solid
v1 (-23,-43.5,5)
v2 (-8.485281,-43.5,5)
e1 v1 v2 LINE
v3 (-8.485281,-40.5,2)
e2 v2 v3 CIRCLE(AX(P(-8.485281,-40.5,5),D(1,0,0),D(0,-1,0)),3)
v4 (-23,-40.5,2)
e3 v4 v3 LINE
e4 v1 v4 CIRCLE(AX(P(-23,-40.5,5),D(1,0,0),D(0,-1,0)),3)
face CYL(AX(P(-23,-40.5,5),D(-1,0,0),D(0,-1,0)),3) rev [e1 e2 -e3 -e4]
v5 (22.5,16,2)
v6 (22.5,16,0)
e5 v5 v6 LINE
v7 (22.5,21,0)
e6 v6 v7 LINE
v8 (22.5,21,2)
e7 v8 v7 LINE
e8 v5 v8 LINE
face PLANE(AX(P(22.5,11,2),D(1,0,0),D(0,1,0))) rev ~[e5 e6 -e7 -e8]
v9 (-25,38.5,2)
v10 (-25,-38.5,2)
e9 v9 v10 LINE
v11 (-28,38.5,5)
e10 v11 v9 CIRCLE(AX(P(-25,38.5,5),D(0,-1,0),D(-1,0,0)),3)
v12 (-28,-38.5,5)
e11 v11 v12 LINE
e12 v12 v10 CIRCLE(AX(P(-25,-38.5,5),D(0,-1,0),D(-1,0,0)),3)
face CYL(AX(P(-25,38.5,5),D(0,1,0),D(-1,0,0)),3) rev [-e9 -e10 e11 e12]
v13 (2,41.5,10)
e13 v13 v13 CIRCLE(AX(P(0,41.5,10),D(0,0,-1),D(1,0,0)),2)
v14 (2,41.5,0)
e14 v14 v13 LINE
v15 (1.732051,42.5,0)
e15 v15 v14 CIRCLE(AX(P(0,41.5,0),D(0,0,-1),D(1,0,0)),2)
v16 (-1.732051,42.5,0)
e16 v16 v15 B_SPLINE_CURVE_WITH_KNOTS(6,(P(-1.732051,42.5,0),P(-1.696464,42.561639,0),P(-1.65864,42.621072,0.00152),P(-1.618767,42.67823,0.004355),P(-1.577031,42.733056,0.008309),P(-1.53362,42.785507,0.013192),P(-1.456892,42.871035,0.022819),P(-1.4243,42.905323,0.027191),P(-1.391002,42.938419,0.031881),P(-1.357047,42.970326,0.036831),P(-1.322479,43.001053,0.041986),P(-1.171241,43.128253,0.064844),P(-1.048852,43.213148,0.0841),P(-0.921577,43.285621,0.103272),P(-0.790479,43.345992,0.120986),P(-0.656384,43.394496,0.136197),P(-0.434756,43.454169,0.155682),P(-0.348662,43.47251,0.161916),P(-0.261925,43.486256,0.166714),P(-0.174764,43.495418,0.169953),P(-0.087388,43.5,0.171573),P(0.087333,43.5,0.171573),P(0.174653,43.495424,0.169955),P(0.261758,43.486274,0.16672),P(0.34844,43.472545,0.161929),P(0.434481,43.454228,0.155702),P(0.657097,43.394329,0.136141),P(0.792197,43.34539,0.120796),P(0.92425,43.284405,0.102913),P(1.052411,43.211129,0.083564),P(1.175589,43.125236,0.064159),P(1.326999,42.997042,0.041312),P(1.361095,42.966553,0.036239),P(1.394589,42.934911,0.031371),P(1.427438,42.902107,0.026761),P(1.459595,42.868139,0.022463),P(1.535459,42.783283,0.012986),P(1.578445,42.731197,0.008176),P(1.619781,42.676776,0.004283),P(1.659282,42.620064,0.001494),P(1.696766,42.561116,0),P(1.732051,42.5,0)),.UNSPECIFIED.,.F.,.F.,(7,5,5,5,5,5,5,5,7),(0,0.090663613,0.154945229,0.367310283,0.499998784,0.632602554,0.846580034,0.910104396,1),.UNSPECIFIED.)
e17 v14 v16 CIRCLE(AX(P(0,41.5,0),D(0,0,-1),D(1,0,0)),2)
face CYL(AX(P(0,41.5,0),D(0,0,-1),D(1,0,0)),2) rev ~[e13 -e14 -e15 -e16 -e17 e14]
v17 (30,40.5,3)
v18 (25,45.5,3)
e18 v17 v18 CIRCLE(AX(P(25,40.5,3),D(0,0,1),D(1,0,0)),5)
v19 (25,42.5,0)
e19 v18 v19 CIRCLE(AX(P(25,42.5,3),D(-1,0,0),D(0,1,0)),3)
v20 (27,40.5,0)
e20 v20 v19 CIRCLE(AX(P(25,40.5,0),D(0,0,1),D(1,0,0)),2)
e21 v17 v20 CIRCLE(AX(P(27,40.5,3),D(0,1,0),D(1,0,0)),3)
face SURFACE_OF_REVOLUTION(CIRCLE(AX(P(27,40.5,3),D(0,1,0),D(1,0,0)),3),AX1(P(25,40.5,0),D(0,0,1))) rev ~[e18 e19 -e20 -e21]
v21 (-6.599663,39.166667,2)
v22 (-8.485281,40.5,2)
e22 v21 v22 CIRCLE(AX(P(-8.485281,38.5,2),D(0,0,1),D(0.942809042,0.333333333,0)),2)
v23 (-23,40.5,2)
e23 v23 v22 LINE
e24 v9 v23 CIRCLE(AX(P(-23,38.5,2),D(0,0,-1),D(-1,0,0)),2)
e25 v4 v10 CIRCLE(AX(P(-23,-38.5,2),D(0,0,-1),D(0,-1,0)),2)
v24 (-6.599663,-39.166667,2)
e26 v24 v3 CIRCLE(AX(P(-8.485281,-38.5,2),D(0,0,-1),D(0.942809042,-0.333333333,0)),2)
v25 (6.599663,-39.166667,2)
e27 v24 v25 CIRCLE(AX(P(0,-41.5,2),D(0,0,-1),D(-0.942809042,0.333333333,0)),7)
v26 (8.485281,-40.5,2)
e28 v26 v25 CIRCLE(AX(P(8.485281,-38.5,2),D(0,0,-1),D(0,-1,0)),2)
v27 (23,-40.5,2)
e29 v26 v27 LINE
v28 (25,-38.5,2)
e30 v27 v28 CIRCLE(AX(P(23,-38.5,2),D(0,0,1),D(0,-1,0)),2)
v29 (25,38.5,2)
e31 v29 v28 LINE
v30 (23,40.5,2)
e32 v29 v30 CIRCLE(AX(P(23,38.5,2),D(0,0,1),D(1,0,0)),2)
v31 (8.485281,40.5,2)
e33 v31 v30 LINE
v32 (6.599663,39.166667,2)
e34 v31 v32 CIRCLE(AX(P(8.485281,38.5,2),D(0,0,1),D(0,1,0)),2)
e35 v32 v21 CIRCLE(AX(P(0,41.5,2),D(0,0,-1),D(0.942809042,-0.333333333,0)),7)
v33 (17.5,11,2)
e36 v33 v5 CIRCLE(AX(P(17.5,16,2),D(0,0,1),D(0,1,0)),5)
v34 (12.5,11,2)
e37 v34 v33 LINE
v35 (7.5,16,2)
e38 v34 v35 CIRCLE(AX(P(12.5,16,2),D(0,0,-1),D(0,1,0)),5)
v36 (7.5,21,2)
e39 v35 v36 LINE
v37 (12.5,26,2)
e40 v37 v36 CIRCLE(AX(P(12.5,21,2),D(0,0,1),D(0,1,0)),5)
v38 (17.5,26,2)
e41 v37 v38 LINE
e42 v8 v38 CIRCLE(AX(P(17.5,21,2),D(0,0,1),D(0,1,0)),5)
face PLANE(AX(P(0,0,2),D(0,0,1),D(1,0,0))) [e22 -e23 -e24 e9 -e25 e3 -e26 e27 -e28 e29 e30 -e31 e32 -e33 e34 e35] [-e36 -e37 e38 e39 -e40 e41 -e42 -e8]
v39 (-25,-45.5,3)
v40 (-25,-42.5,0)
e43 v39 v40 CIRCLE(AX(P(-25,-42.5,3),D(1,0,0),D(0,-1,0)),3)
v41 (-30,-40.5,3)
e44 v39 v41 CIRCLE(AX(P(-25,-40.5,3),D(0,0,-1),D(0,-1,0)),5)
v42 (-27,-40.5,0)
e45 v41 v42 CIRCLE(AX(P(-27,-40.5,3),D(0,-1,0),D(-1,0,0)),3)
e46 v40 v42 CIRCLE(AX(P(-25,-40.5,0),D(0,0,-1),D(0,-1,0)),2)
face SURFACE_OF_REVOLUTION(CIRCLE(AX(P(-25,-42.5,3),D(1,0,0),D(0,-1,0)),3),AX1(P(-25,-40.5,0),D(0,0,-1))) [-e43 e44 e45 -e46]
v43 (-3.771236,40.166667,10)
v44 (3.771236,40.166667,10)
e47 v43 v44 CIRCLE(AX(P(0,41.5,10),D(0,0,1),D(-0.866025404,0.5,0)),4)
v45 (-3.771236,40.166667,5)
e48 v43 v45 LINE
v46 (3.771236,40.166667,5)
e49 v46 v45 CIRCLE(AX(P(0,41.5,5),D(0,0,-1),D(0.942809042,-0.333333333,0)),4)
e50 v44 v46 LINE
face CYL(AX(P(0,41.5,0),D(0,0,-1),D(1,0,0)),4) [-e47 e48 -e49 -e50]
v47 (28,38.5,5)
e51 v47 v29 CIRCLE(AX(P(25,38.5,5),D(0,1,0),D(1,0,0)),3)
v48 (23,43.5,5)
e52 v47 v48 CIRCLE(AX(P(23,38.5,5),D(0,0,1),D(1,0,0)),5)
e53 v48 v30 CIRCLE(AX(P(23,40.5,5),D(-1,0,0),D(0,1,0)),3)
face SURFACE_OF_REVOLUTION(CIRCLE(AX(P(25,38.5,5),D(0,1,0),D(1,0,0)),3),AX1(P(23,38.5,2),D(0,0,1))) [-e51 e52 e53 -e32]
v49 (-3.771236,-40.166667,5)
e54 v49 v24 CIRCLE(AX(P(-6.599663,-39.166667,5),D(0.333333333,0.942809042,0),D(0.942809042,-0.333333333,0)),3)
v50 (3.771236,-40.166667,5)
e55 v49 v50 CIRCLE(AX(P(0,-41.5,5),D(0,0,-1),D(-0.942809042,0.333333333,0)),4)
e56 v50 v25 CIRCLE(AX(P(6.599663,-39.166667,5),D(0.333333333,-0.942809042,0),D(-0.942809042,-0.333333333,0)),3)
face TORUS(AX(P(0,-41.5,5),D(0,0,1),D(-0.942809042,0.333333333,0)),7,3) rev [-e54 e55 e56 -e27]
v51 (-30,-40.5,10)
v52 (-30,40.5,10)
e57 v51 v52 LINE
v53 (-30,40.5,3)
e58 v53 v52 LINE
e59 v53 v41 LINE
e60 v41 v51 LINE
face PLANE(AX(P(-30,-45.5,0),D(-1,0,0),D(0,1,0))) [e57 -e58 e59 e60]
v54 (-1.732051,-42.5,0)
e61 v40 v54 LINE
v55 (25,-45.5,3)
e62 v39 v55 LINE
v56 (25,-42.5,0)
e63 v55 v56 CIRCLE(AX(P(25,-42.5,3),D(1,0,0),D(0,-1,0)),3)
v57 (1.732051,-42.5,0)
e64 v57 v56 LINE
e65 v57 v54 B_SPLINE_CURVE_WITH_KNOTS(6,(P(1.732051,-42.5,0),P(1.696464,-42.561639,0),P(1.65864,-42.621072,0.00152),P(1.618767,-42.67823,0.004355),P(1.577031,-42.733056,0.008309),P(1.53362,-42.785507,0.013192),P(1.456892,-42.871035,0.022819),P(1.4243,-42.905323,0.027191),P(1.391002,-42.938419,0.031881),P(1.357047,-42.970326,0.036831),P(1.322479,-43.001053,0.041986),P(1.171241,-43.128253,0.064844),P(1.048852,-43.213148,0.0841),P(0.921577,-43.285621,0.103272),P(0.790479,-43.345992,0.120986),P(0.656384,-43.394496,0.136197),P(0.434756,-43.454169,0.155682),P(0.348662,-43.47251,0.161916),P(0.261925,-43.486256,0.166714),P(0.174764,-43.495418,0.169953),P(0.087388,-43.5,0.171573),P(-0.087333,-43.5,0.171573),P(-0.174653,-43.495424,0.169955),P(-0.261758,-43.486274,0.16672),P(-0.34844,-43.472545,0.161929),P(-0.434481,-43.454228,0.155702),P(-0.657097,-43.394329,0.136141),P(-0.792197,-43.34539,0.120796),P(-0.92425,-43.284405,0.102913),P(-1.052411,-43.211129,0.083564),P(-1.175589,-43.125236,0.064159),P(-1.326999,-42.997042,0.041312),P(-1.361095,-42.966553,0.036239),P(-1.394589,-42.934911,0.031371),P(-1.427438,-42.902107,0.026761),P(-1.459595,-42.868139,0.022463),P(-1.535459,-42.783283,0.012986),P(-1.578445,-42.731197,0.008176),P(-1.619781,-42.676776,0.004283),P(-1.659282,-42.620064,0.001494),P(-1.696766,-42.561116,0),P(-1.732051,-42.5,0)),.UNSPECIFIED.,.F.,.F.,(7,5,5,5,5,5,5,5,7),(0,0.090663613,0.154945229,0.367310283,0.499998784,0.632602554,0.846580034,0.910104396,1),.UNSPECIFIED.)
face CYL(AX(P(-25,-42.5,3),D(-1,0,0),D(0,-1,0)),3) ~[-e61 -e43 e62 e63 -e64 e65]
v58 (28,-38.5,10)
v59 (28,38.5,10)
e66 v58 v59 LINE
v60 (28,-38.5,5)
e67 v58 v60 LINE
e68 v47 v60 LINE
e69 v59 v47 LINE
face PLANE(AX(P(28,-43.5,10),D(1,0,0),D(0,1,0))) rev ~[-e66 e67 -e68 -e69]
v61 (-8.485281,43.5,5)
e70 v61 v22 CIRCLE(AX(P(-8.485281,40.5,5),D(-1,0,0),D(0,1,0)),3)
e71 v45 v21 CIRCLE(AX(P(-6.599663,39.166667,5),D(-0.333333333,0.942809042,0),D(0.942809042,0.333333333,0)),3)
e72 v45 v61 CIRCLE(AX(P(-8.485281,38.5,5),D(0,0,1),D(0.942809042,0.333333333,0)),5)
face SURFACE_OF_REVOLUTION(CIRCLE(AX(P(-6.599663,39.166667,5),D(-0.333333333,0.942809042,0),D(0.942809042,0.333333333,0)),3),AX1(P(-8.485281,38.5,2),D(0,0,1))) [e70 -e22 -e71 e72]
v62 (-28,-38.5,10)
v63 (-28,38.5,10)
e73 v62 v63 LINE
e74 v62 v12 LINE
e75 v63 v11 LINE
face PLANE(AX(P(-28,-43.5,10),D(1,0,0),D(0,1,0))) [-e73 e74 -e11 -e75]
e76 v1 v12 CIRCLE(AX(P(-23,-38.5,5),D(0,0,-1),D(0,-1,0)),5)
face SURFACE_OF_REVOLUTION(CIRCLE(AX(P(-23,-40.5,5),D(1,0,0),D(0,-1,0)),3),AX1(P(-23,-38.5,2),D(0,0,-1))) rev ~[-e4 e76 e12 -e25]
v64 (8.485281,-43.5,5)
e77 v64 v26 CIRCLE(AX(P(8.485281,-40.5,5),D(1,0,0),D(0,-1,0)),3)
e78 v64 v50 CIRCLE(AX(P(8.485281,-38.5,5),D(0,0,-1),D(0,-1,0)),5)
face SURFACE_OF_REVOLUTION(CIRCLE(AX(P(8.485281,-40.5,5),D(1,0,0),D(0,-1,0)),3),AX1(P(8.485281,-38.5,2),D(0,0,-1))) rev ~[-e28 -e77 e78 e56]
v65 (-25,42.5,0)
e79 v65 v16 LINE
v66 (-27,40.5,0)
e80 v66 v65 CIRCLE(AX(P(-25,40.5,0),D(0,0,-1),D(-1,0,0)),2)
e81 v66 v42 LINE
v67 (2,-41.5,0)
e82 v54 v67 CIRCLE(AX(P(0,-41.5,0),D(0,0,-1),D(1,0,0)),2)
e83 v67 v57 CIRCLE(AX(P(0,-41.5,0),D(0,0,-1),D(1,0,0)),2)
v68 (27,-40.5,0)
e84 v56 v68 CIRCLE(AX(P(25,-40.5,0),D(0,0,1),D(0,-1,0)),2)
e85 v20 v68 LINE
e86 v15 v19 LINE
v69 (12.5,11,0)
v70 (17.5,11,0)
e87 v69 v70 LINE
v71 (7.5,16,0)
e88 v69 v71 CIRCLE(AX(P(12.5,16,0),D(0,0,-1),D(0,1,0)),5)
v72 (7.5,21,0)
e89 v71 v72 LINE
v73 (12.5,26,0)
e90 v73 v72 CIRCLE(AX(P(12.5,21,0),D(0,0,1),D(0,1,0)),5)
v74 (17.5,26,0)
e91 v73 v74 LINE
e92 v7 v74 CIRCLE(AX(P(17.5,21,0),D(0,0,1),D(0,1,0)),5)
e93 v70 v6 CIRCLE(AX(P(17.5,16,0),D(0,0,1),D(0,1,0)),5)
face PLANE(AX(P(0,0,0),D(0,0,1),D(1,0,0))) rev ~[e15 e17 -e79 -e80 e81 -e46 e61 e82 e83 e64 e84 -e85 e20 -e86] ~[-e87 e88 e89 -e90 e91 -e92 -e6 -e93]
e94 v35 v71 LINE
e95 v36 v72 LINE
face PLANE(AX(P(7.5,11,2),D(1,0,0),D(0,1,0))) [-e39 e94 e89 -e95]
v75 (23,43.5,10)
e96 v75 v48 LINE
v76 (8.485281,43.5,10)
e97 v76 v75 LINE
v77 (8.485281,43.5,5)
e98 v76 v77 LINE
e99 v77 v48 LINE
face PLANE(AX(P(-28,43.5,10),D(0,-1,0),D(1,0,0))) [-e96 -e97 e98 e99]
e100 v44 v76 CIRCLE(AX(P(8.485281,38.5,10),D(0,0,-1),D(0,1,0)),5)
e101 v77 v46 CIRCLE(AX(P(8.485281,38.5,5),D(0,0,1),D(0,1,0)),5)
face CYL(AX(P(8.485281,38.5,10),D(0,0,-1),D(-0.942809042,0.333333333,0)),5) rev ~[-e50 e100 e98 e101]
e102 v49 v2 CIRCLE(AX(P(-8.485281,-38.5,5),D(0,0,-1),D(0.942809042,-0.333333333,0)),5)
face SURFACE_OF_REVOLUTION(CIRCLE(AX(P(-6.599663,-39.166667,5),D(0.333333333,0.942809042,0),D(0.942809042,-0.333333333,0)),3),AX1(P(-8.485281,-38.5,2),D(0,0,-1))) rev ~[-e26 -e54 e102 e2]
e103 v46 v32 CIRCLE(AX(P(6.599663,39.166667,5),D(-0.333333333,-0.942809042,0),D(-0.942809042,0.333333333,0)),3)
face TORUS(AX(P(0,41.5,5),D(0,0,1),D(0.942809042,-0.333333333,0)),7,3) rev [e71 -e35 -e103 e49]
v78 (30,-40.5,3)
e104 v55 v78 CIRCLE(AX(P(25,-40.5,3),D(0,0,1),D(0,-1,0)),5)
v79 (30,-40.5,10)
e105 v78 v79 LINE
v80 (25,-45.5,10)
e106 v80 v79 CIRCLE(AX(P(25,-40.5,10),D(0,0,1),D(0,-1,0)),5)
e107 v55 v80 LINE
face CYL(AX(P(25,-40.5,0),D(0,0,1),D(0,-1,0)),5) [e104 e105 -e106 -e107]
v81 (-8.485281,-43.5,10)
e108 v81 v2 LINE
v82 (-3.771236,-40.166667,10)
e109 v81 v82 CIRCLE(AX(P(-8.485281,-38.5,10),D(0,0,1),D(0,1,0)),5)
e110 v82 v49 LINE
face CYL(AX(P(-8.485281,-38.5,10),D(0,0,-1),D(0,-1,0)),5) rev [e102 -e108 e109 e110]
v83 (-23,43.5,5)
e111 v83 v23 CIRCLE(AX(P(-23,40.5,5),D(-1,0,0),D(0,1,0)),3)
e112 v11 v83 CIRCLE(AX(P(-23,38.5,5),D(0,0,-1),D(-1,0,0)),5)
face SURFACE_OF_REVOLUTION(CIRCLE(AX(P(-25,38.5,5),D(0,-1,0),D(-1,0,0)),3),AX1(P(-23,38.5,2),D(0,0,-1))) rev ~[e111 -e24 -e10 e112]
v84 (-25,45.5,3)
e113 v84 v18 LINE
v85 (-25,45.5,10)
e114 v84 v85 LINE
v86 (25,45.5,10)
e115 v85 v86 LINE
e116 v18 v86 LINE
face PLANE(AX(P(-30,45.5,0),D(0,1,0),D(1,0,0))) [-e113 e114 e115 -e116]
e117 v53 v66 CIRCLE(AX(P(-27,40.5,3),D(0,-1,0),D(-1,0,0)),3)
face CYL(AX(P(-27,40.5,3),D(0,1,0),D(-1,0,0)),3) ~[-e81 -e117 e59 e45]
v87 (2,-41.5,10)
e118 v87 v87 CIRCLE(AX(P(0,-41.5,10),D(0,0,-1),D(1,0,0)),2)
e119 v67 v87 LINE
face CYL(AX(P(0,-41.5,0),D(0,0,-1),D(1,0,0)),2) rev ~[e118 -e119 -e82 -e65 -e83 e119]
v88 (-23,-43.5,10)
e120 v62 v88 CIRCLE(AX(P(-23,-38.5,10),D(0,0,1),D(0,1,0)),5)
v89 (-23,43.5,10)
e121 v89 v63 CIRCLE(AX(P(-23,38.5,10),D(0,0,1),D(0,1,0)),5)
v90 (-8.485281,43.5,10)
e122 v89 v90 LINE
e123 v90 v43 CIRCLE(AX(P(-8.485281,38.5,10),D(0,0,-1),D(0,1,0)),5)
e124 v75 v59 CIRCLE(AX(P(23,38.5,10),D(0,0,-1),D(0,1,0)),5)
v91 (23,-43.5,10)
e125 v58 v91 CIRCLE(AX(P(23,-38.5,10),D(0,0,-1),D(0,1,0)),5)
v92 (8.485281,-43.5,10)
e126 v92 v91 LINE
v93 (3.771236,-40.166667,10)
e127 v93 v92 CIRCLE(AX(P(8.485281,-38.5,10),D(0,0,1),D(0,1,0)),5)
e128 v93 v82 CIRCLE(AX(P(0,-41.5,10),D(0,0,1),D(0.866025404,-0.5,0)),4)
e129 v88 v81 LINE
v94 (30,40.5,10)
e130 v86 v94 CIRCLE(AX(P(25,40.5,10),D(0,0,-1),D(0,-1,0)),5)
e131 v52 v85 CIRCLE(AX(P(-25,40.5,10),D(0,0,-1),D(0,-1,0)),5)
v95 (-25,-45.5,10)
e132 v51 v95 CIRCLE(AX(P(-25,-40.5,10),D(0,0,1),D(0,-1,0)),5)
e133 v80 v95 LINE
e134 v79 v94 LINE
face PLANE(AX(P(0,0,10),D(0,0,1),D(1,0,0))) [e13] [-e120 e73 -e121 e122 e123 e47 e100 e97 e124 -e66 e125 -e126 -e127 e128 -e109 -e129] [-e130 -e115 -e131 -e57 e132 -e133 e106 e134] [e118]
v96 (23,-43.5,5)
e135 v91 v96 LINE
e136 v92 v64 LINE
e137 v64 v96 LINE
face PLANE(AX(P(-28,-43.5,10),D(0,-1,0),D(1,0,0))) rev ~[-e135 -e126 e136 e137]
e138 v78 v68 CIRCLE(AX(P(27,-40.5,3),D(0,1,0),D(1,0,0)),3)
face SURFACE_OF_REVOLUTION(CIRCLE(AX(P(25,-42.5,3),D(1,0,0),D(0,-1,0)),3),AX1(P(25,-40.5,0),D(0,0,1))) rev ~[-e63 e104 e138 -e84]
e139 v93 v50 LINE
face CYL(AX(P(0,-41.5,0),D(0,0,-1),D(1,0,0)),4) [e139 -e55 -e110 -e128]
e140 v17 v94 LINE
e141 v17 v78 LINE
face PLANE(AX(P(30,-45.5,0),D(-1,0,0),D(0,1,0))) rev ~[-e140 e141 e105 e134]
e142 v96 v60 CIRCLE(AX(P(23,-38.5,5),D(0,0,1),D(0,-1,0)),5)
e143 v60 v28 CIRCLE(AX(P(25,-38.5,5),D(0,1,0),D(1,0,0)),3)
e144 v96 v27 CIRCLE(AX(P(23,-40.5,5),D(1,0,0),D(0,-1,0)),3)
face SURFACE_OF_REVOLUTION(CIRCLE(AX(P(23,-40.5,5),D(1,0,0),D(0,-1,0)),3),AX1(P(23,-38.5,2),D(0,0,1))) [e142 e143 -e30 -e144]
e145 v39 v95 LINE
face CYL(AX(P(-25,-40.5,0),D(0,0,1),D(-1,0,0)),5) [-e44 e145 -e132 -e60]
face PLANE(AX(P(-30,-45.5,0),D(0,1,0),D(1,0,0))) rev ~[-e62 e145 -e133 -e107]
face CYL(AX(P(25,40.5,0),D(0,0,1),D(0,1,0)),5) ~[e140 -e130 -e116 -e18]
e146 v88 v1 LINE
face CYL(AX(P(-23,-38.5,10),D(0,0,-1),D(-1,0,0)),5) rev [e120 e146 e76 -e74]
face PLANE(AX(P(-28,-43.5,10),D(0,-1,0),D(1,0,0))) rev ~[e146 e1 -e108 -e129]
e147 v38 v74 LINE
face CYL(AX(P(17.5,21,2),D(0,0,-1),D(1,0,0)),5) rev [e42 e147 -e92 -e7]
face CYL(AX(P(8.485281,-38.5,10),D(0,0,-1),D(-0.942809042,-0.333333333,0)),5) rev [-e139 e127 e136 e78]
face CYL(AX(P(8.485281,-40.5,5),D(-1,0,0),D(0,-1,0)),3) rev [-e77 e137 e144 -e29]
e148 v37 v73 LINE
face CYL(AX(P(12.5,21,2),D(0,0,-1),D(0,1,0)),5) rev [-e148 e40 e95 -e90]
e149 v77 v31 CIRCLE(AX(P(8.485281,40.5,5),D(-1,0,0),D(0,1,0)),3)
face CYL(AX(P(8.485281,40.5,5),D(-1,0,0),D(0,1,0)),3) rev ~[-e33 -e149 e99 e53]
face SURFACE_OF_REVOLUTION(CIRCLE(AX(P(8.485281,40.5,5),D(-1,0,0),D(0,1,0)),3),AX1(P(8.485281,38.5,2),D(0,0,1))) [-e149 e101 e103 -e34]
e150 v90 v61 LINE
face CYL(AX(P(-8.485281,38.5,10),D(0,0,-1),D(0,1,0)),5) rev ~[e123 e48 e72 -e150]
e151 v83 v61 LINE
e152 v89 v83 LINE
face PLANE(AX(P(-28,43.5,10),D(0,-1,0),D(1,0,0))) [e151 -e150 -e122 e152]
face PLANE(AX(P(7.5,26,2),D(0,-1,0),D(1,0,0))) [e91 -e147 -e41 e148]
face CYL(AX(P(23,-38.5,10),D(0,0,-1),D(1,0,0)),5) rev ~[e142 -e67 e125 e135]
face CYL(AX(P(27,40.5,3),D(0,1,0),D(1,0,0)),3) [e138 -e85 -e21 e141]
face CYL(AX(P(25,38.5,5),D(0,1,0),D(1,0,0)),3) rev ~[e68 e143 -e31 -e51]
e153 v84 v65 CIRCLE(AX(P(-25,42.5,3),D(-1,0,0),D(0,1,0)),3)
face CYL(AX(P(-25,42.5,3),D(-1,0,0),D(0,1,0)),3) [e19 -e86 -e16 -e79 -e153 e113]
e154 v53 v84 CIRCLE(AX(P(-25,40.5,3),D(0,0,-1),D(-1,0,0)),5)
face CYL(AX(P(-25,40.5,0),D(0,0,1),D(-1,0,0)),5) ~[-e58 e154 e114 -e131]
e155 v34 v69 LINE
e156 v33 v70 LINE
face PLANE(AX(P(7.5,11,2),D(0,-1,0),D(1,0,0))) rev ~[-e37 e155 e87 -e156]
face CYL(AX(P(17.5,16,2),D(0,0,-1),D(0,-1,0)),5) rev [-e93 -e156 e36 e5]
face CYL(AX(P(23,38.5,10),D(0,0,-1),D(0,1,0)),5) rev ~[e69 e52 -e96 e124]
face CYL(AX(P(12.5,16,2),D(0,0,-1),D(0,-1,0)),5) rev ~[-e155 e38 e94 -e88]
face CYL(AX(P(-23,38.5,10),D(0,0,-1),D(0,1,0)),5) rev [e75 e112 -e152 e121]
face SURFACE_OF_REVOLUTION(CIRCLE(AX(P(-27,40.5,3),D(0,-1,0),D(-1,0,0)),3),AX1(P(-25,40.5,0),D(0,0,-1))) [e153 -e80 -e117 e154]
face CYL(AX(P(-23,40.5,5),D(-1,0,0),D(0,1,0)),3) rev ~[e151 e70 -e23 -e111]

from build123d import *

# Parameters (mm, degrees)
F3_W          = 60
F3_H          = 91
F4_DEPTH      = 10
F5_W          = 56
F5_H          = 87
F6_DEPTH      = 8
F7_R          = 4
F8_DEPTH      = 10
F9_R          = 2
F10_DEPTH     = 10.001
F11_R         = 5
F12_R         = 5
F13_T1_DEPTH  = 77
F13_T3_DEPTH  = 14.5147186258
F13_T5_DEPTH  = 14.5147186258
F13_T8_ANGLE  = 90
F13_T10_ANGLE = 70.5287793655
F13_T12_ANGLE = 141.057558731
F13_T14_ANGLE = 90
F13_T16_ANGLE = 70.5287793655
F13_T18_ANGLE = 70.5287793655
F13_T20_ANGLE = 90
F13_T22_ANGLE = 141.057558731
F13_T24_ANGLE = 70.5287793655
F13_T26_ANGLE = 90
F13_T27_DEPTH = 81
F13_T29_DEPTH = 50
F13_T32_ANGLE = 90
F13_T34_ANGLE = 90
F13_T36_ANGLE = 90
F13_T38_ANGLE = 90
F14_W         = 15
F14_H         = 15
F15_DEPTH     = 2.0010001
F16_R         = 5


# Not quite as in the source:
# - a fillet or chamfer that OpenCascade refuses, or shapes differently, is made with other operations: its cross-section is extruded or revolved along the edge and cut away or added


with BuildPart() as f4:
    # F3 (on Top) → F4 (new body)
    with BuildSketch(Plane.XY):
        Rectangle(F3_W, F3_H)
    extrude(amount=F4_DEPTH)

    # F5 (on face) → F6 (cut)
    with BuildSketch(Plane.XY.offset(10)):
        Rectangle(F5_W, F5_H)
    extrude(amount=-F6_DEPTH, mode=Mode.SUBTRACT)

    # F7 (on face) → F8 (join)
    with BuildSketch(Plane(origin=(0, 0, 0), x_dir=(1, 0, 0), z_dir=(0, 0, -1))):
        with Locations((0, -41.5)):
            Circle(F7_R)
        with Locations((0, 41.5)):
            Circle(F7_R)
    extrude(amount=-F8_DEPTH)

    # F9 (on face) → F10 (cut, through all)
    with BuildSketch(Plane(origin=(0, 0, 0), x_dir=(1, 0, 0), z_dir=(0, 0, -1))):
        with Locations((0, -41.5)):
            Circle(F9_R)
        with Locations((0, 41.5)):
            Circle(F9_R)
    extrude(amount=-F10_DEPTH, mode=Mode.SUBTRACT)

    # F11
    f11_edges = [f4.edges().sort_by_distance(p)[0] for p in [
        (3.464102, 43.5, 6),
        (-3.464102, 43.5, 6),
        (-3.464102, -43.5, 6),
        (3.464102, -43.5, 6),
    ]]
    fillet(f11_edges, radius=F11_R)

    # F12
    f12_edges = [f4.edges().sort_by_distance(p)[0] for p in [
        (30, -45.5, 5),
        (-30, -45.5, 5),
        (30, 45.5, 5),
        (-30, 45.5, 5),
        (28, -43.5, 6),
        (-28, -43.5, 6),
        (-28, 43.5, 6),
        (28, 43.5, 6),
    ]]
    fillet(f12_edges, radius=F12_R)

    # F13: fillet of radius 3 on 24 edges, made by hand

    # F13_s2 → F13_t1 (join)
    with BuildSketch(Plane.XZ.offset(-38.5)):
        with BuildLine():
            ThreePointArc((-28, 5), (-27.1213203436, 2.8786796564), (-25, 2))
            Line((-25, 2), (-28, 2))
            Line((-28, 2), (-28, 5))
        make_face()
        with BuildLine():
            ThreePointArc((28, 5), (27.1213203436, 2.8786796564), (25, 2))
            Line((25, 2), (28, 2))
            Line((28, 2), (28, 5))
        make_face()
    extrude(amount=F13_T1_DEPTH)

    # F13_s4 → F13_t3 (join)
    with BuildSketch(Plane.YZ.offset(8.4852813742)):
        with BuildLine():
            ThreePointArc((-43.5, 5), (-42.6213203436, 2.8786796564), (-40.5, 2))
            Line((-40.5, 2), (-43.5, 2))
            Line((-43.5, 2), (-43.5, 5))
        make_face()
        with BuildLine():
            ThreePointArc((43.5, 5), (42.6213203436, 2.8786796564), (40.5, 2))
            Line((40.5, 2), (43.5, 2))
            Line((43.5, 2), (43.5, 5))
        make_face()
    extrude(amount=F13_T3_DEPTH)

    # F13_s6 → F13_t5 (join)
    with BuildSketch(Plane.YZ.offset(-23)):
        with BuildLine():
            ThreePointArc((-43.5, 5), (-42.6213203436, 2.8786796564), (-40.5, 2))
            Line((-40.5, 2), (-43.5, 2))
            Line((-43.5, 2), (-43.5, 5))
        make_face()
        with BuildLine():
            ThreePointArc((43.5, 5), (42.6213203436, 2.8786796564), (40.5, 2))
            Line((40.5, 2), (43.5, 2))
            Line((43.5, 2), (43.5, 5))
        make_face()
    extrude(amount=F13_T5_DEPTH)

    # F13_s7 → F13_t8 (revolve)
    with BuildSketch(Plane.YZ.offset(23)):
        with BuildLine():
            ThreePointArc((-43.5, 5), (-42.6213203436, 2.8786796564), (-40.5, 2))
            Line((-40.5, 2), (-43.5, 2))
            Line((-43.5, 2), (-43.5, 5))
        make_face()
    revolve(axis=Axis((23, -38.5, 2), (0, 0, 1)), revolution_arc=F13_T8_ANGLE)

    # F13_s9 → F13_t10 (revolve)
    with BuildSketch(Plane.YZ.offset(8.4852813742)):
        with BuildLine():
            ThreePointArc((-43.5, 5), (-42.6213203436, 2.8786796564), (-40.5, 2))
            Line((-40.5, 2), (-43.5, 2))
            Line((-43.5, 2), (-43.5, 5))
        make_face()
    revolve(axis=Axis((8.4852813742, -38.5, 2), (0, 0, -1)), revolution_arc=F13_T10_ANGLE)

    # F13_s11 → F13_t12 (revolve)
    with BuildSketch(Plane(origin=(-13.0421917419, -36.8888888889, 0), x_dir=(0, 0, 1), z_dir=(-0.3333333333, -0.9428090416, 0))):
        with BuildLine():
            ThreePointArc((5, -9.8333333333), (2.8786796564, -8.9546536769), (2, -6.8333333333))
            Line((2, -6.8333333333), (2, -9.8333333333))
            Line((2, -9.8333333333), (5, -9.8333333333))
        make_face()
    revolve(axis=Axis((0, -41.5, 2), (0, 0, -1)), revolution_arc=F13_T12_ANGLE)

    # F13_s13 → F13_t14 (revolve)
    with BuildSketch(Plane.XZ.offset(-38.5)):
        with BuildLine():
            ThreePointArc((28, 5), (27.1213203436, 2.8786796564), (25, 2))
            Line((25, 2), (28, 2))
            Line((28, 2), (28, 5))
        make_face()
    revolve(axis=Axis((23, 38.5, 2), (0, 0, 1)), revolution_arc=F13_T14_ANGLE)

    # F13_s15 → F13_t16 (revolve)
    with BuildSketch(Plane(origin=(-13.0421917419, -36.8888888889, 0), x_dir=(0, 0, 1), z_dir=(0.3333333333, 0.9428090416, 0))):
        with BuildLine():
            ThreePointArc((5, 9.8333333333), (2.8786796564, 8.9546536769), (2, 6.8333333333))
            Line((2, 6.8333333333), (2, 9.8333333333))
            Line((2, 9.8333333333), (5, 9.8333333333))
        make_face()
    revolve(axis=Axis((-8.4852813742, -38.5, 2), (0, 0, -1)), revolution_arc=F13_T16_ANGLE)

    # F13_s17 → F13_t18 (revolve)
    with BuildSketch(Plane.YZ.offset(8.4852813742)):
        with BuildLine():
            ThreePointArc((43.5, 5), (42.6213203436, 2.8786796564), (40.5, 2))
            Line((40.5, 2), (43.5, 2))
            Line((43.5, 2), (43.5, 5))
        make_face()
    revolve(axis=Axis((8.4852813742, 38.5, 2), (0, 0, 1)), revolution_arc=F13_T18_ANGLE)

    # F13_s19 → F13_t20 (revolve)
    with BuildSketch(Plane.YZ.offset(-23)):
        with BuildLine():
            ThreePointArc((-43.5, 5), (-42.6213203436, 2.8786796564), (-40.5, 2))
            Line((-40.5, 2), (-43.5, 2))
            Line((-43.5, 2), (-43.5, 5))
        make_face()
    revolve(axis=Axis((-23, -38.5, 2), (0, 0, -1)), revolution_arc=F13_T20_ANGLE)

    # F13_s21 → F13_t22 (revolve)
    with BuildSketch(Plane(origin=(13.0421917419, 36.8888888889, 0), x_dir=(0, 0, 1), z_dir=(0.3333333333, 0.9428090416, 0))):
        with BuildLine():
            ThreePointArc((5, -9.8333333333), (2.8786796564, -8.9546536769), (2, -6.8333333333))
            Line((2, -6.8333333333), (2, -9.8333333333))
            Line((2, -9.8333333333), (5, -9.8333333333))
        make_face()
    revolve(axis=Axis((0, 41.5, 2), (0, 0, -1)), revolution_arc=F13_T22_ANGLE)

    # F13_s23 → F13_t24 (revolve)
    with BuildSketch(Plane(origin=(-13.0421917419, 36.8888888889, 0), x_dir=(0, 0, 1), z_dir=(0.3333333333, -0.9428090416, 0))):
        with BuildLine():
            ThreePointArc((5, -9.8333333333), (2.8786796564, -8.9546536769), (2, -6.8333333333))
            Line((2, -6.8333333333), (2, -9.8333333333))
            Line((2, -9.8333333333), (5, -9.8333333333))
        make_face()
    revolve(axis=Axis((-8.4852813742, 38.5, 2), (0, 0, 1)), revolution_arc=F13_T24_ANGLE)

    # F13_s25 → F13_t26 (revolve)
    with BuildSketch(Plane.XZ.offset(-38.5)):
        with BuildLine():
            ThreePointArc((-28, 5), (-27.1213203436, 2.8786796564), (-25, 2))
            Line((-25, 2), (-28, 2))
            Line((-28, 2), (-28, 5))
        make_face()
    revolve(axis=Axis((-23, 38.5, 2), (0, 0, -1)), revolution_arc=F13_T26_ANGLE)

    # F13_s28 → F13_t27 (cut)
    with BuildSketch(Plane.XZ.offset(-40.5)):
        with BuildLine():
            ThreePointArc((30, 3), (29.1213203436, 0.8786796564), (27, 0))
            Line((27, 0), (30, 0))
            Line((30, 0), (30, 3))
        make_face()
        with BuildLine():
            ThreePointArc((-30, 3), (-29.1213203436, 0.8786796564), (-27, 0))
            Line((-27, 0), (-30, 0))
            Line((-30, 0), (-30, 3))
        make_face()
    extrude(amount=F13_T27_DEPTH, mode=Mode.SUBTRACT)

    # F13_s30 → F13_t29 (cut)
    with BuildSketch(Plane.YZ.offset(-25)):
        with BuildLine():
            ThreePointArc((-45.5, 3), (-44.6213203436, 0.8786796564), (-42.5, 0))
            Line((-42.5, 0), (-45.5, 0))
            Line((-45.5, 0), (-45.5, 3))
        make_face()
        with BuildLine():
            ThreePointArc((45.5, 3), (44.6213203436, 0.8786796564), (42.5, 0))
            Line((42.5, 0), (45.5, 0))
            Line((45.5, 0), (45.5, 3))
        make_face()
    extrude(amount=F13_T29_DEPTH, mode=Mode.SUBTRACT)

    # F13_s31 → F13_t32 (revolve, cut)
    with BuildSketch(Plane.YZ.offset(25)):
        with BuildLine():
            ThreePointArc((-45.5, 3), (-44.6213203436, 0.8786796564), (-42.5, 0))
            Line((-42.5, 0), (-45.5, 0))
            Line((-45.5, 0), (-45.5, 3))
        make_face()
    revolve(axis=Axis((25, -40.5, 0), (0, 0, 1)), revolution_arc=F13_T32_ANGLE, mode=Mode.SUBTRACT)

    # F13_s33 → F13_t34 (revolve, cut)
    with BuildSketch(Plane.YZ.offset(-25)):
        with BuildLine():
            ThreePointArc((-45.5, 3), (-44.6213203436, 0.8786796564), (-42.5, 0))
            Line((-42.5, 0), (-45.5, 0))
            Line((-45.5, 0), (-45.5, 3))
        make_face()
    revolve(axis=Axis((-25, -40.5, 0), (0, 0, -1)), revolution_arc=F13_T34_ANGLE, mode=Mode.SUBTRACT)

    # F13_s35 → F13_t36 (revolve, cut)
    with BuildSketch(Plane.XZ.offset(-40.5)):
        with BuildLine():
            ThreePointArc((30, 3), (29.1213203436, 0.8786796564), (27, 0))
            Line((27, 0), (30, 0))
            Line((30, 0), (30, 3))
        make_face()
    revolve(axis=Axis((25, 40.5, 0), (0, 0, 1)), revolution_arc=F13_T36_ANGLE, mode=Mode.SUBTRACT)

    # F13_s37 → F13_t38 (revolve, cut)
    with BuildSketch(Plane.XZ.offset(-40.5)):
        with BuildLine():
            ThreePointArc((-30, 3), (-29.1213203436, 0.8786796564), (-27, 0))
            Line((-27, 0), (-30, 0))
            Line((-30, 0), (-30, 3))
        make_face()
    revolve(axis=Axis((-25, 40.5, 0), (0, 0, -1)), revolution_arc=F13_T38_ANGLE, mode=Mode.SUBTRACT)

    # F14 (on face) → F15 (cut, through all)
    with BuildSketch(Plane.XY.offset(2)):
        with Locations((15, 18.5)):
            Rectangle(F14_W, F14_H)
    extrude(amount=-F15_DEPTH, mode=Mode.SUBTRACT)

    # F16
    f16_edges = [f4.edges().sort_by_distance(p)[0] for p in [
        (7.5, 26, 1),
        (22.5, 26, 1),
        (22.5, 11, 1),
        (7.5, 11, 1),
    ]]
    fillet(f16_edges, radius=F16_R)


solid = f4.part
